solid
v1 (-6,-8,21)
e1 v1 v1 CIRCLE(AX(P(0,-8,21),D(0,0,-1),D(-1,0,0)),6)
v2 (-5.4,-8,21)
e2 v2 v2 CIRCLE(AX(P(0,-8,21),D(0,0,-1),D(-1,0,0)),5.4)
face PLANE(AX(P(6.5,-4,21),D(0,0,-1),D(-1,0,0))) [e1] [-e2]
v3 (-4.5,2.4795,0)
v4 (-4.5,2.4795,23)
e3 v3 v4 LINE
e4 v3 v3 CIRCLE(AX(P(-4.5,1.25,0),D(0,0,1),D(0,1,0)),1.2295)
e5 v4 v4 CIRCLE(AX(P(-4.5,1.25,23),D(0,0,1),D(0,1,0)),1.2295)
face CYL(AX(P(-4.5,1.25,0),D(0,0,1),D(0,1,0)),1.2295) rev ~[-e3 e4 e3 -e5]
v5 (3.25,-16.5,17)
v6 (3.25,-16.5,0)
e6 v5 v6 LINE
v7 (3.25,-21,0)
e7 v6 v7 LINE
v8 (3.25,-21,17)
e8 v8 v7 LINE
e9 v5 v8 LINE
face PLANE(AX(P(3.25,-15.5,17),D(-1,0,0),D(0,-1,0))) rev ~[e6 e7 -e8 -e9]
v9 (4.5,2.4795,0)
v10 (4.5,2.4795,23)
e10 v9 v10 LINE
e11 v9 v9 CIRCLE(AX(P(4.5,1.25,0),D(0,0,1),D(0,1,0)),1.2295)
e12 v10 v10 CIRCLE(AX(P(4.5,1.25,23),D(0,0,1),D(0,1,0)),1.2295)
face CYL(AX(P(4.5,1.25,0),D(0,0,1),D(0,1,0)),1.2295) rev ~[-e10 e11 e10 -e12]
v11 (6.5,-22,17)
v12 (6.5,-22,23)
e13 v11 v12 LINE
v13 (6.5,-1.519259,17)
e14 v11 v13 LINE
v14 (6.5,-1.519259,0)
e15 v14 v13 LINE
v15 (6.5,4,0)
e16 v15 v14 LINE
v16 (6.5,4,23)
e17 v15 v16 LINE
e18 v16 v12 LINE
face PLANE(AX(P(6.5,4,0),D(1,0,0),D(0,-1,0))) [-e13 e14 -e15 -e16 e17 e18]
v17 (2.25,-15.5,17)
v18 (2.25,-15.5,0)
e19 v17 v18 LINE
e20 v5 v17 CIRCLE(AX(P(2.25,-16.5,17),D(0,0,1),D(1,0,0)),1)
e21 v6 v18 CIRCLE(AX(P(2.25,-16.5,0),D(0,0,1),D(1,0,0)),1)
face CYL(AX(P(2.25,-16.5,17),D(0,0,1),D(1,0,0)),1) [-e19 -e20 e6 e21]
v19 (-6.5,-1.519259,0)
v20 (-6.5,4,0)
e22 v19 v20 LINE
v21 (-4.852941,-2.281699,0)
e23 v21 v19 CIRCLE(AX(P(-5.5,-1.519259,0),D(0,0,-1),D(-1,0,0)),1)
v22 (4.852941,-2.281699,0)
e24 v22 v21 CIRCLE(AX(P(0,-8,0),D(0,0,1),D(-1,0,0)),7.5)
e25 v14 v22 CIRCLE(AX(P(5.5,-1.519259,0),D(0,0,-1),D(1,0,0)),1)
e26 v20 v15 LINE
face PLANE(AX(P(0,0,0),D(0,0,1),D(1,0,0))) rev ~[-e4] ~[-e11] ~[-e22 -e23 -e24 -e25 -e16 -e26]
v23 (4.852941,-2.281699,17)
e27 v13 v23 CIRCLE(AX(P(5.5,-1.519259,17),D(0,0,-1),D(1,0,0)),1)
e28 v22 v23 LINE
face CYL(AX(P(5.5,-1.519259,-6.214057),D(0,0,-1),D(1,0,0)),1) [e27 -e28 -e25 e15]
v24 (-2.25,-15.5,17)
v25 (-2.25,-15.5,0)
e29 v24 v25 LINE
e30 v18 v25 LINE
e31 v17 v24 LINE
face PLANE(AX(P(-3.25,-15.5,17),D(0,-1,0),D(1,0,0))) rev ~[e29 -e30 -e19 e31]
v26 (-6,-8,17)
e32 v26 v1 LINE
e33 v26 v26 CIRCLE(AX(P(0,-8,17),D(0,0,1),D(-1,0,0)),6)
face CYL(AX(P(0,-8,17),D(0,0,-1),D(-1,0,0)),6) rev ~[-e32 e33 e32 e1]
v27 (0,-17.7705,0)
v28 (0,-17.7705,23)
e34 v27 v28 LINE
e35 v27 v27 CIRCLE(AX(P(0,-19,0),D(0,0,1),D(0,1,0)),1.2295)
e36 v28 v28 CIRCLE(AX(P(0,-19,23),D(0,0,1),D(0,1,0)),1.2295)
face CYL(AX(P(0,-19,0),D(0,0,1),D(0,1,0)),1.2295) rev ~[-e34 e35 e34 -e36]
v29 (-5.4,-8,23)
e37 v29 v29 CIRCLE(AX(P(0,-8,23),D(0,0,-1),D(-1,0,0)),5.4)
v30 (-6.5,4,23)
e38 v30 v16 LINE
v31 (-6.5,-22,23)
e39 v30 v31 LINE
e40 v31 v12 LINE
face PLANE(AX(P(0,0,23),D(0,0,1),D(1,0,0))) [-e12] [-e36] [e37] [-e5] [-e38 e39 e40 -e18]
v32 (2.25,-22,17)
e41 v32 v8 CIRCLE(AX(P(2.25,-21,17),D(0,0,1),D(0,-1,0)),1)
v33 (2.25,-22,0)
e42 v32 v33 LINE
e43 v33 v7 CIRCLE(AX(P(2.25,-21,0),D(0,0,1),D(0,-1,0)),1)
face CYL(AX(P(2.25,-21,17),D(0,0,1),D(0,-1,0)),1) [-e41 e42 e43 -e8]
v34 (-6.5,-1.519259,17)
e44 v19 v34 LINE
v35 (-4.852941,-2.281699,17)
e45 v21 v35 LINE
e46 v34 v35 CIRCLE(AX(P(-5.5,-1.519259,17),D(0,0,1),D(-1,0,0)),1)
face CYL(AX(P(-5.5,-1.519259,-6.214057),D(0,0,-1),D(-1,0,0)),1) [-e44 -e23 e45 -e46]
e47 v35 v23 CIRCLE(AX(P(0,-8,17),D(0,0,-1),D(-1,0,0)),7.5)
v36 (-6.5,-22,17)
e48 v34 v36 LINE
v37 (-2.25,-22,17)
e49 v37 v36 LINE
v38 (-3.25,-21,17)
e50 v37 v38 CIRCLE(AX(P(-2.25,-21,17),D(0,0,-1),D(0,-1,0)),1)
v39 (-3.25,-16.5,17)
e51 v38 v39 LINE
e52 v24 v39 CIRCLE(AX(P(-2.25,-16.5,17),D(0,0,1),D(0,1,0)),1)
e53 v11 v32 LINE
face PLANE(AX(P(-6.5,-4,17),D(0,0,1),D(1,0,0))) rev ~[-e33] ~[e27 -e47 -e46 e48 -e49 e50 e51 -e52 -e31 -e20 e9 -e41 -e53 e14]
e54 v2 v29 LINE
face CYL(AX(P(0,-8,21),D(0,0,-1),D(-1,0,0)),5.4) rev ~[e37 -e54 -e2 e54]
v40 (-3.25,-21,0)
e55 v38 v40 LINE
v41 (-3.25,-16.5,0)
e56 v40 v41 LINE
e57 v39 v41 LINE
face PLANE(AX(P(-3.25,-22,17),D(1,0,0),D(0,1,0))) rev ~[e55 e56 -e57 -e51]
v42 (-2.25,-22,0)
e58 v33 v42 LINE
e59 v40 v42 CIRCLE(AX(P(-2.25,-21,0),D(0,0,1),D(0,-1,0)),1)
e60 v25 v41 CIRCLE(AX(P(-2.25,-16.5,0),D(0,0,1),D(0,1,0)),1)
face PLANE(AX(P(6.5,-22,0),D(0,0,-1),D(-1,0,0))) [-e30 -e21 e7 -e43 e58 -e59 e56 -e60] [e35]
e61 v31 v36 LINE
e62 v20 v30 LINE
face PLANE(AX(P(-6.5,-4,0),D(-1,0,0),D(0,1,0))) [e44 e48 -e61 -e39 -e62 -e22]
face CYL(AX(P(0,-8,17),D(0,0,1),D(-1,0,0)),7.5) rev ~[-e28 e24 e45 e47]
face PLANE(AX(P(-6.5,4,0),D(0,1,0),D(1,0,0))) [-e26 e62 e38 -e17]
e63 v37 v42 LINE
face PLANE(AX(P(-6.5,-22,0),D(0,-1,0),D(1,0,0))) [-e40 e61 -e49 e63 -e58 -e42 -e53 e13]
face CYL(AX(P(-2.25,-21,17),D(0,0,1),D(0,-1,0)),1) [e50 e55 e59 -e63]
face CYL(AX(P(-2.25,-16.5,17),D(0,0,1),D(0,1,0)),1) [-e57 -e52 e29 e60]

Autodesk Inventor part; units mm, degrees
ref_plane "YZ Plane" through (0, 0, 0) normal (1, 0, 0) x (0, 1, 0)
ref_plane "XZ Plane" through (0, 0, 0) normal (0, 1, 0) x (-1, 0, 0)
ref_plane "XY Plane" through (0, 0, 0) normal (0, 0, 1) x (1, 0, 0)
sketch "Sketch1" plane through (0, 0, 0) normal (0, 0, 1) x (1, 0, 0)
  line L0 (-6.5, 4) -> (6.5, 4)
  line L1 (6.5, 4) -> (6.5, -4)
  line L2 (6.5, -4) -> (-6.5, -4)
  line L3 (-6.5, -4) -> (-6.5, 4)
  line L4 (-6.5, 4) -> (6.5, -4) construction
  line L5 (6.5, 4) -> (-6.5, -4) construction
  point P0 (0, 0)
  point P1 (4.5, 1.25)
  point P2 (-4.5, 1.25)
  dimension "d0" = 13
  dimension "d1" = 8
  dimension "d64" = 2.75
  dimension "d65" = 2
  dimension "d66" = 2.75
  dimension "d67" = 2
extrude "Extrusion1" add sketch "Sketch1" along normal blind 48
hole "Hole1" at (-4.5, 1.25, 0) at (4.5, 1.25, 0) direction (0, 0, 1) diameter 2.459 end through all thread size "M3x0.5" class "6H" standard "ISO Metric profile"
sketch "Sketch6" plane through (-6.5, -4, 0) normal (0, -1, 0) x (1, 0, 0)
  line L0 (0.2, 0) -> (0, 0) projected
  line L1 (12.8, 0) -> (12.8, 36.9748) projected
  line L2 (0, 0) -> (12.8, 0)
  line L3 (12.8, 0) -> (12.8, 17)
  line L4 (12.8, 17) -> (0, 17)
  line L5 (0, 17) -> (0, 0)
  line L6 (13, 0) -> (13, 48) projected
  line L7 (0, 17) -> (13, 17)
  line L8 (13, 17) -> (13, 23)
  line L9 (13, 23) -> (0, 23)
  line L10 (0, 23) -> (0, 17)
  point P0 (6.5, 0)
  point P1 (12.8, 36.8338)
  point P2 (13, 36.8338)
  point P3 (13, 37.0101)
  dimension "d60" = 17
  dimension "d61" = 6
extrude "Extrusion3" add sketch "Sketch6" along normal blind 18 contours L10 L9 L1 L4 | L1 L9 L6 L7
sketch "Sketch7" plane through (6.5, -4, 17) normal (0, 0, -1) x (-1, 0, 0)
  line L0 (13, 8) -> (0, 8) projected
  circle A0 centre (6.5, -4) radius 6
  point P0 (6.5, 4)
  dimension "d68" = 12
  dimension "d69" = 12
extrude "Extrusion4" cut sketch "Sketch7" against normal blind 4
sketch "Sketch8" plane through (6.5, -22, 17) normal (0, 0, -1) x (-1, 0, 0)
  circle A0 centre (6.5, 14) radius 6 projected
  circle A1 centre (6.5, 14) radius 7.5
  point P0 (6.5, 22)
  dimension "d72" = 15
extrude "Extrusion5" cut sketch "Sketch8" along normal through all contours A0 | A1
sketch "Sketch9" plane through (0, -8, 21) normal (0, 0, -1) x (-1, 0, 0)
  circle A0 centre (0, 0) radius 5.4
  point P0 (0, 8)
  dimension "d75" = 10.8
extrude "Extrusion6" cut sketch "Sketch9" against normal up to surface (2 mm away)
sketch "Sketch10" plane through (6.5, -22, 17) normal (0, 0, -1) x (-1, 0, 0)
  line L0 (3.25, 6.5) -> (3.25, 0)
  line L1 (3.25, 0) -> (9.75, 0)
  line L2 (9.75, 0) -> (9.75, 6.5)
  line L3 (9.75, 6.5) -> (3.25, 6.5)
  line L4 (3.25, 6.5) -> (9.75, 0) construction
  line L5 (3.25, 0) -> (9.75, 6.5) construction
  circle A0 centre (6.5, 14) radius 6 projected
  circle A1 centre (6.5, 14) radius 7.5 projected
  point P0 (6.5, 22)
  point P1 (6.5, 3.25)
  dimension "d78" = 6.5
  dimension "d80" = 6.5
  dimension "d81" = 3.25
  dimension "d95" = 7.5
extrude "Extrusion7" add sketch "Sketch10" along normal up to surface (17 mm away) contours L3 L2 L1 L0
sketch "Sketch11" plane through (3.25, -15.5, 0) normal (0, 0, -1) x (-1, 0, 0)
  line L0 (9.75, 19.5) -> (-3.25, 19.5) projected
  line L1 (-3.25, 19.5) -> (-3.25, 11.5) projected
  line L2 (6.5, 0) -> (0, 0) projected
  point P0 (3.25, 15.5)
  point P1 (3.25, -3.5)
  point P2 (9.55, 19.5)
  point P3 (-3.05, 19.5)
  point P4 (-3.25, 19.3)
  dimension "d85" = 6.5
  dimension "d96" = 3.5
  dimension "d97" = 23
hole "Hole5" at (0, -19, 0) direction (0, 0, 1) diameter 2.459 end through all thread size "M3x0.5" class "6H" standard "ISO Metric profile"
fillet "Fillet2" radius 1 8 edges at (-6.3443, -4, 8.5) (6.3443, -4, 8.5) (-6.5, -4, 8.5) (6.5, -4, 8.5) (-3.25, -15.5, 8.5) (3.25, -15.5, 8.5) (3.25, -22, 8.5) (-3.25, -22, 8.5)
sketch "Sketch13" plane through (0, 0, 0) normal (0, 0, -1) x (-1, 0, 0)
  point P0 (-4.5, 1.25)
move faces "Move1" translate (0, 0, -25) faces at (-1.2282, -2.5568, 48)
sketch "Sketch15" plane through (-6.5, -22, 23) normal (0, 0, 1) x (1, 0, 0)
  point P0 (6.5, 22)
equation "\"d66\" = d64"
equation "\"d67\" = d65"
equation "\"d81\" = 0.5 * d78"
properties part number "cam-flying-mount-rev2" material "Aluminum 6061"
